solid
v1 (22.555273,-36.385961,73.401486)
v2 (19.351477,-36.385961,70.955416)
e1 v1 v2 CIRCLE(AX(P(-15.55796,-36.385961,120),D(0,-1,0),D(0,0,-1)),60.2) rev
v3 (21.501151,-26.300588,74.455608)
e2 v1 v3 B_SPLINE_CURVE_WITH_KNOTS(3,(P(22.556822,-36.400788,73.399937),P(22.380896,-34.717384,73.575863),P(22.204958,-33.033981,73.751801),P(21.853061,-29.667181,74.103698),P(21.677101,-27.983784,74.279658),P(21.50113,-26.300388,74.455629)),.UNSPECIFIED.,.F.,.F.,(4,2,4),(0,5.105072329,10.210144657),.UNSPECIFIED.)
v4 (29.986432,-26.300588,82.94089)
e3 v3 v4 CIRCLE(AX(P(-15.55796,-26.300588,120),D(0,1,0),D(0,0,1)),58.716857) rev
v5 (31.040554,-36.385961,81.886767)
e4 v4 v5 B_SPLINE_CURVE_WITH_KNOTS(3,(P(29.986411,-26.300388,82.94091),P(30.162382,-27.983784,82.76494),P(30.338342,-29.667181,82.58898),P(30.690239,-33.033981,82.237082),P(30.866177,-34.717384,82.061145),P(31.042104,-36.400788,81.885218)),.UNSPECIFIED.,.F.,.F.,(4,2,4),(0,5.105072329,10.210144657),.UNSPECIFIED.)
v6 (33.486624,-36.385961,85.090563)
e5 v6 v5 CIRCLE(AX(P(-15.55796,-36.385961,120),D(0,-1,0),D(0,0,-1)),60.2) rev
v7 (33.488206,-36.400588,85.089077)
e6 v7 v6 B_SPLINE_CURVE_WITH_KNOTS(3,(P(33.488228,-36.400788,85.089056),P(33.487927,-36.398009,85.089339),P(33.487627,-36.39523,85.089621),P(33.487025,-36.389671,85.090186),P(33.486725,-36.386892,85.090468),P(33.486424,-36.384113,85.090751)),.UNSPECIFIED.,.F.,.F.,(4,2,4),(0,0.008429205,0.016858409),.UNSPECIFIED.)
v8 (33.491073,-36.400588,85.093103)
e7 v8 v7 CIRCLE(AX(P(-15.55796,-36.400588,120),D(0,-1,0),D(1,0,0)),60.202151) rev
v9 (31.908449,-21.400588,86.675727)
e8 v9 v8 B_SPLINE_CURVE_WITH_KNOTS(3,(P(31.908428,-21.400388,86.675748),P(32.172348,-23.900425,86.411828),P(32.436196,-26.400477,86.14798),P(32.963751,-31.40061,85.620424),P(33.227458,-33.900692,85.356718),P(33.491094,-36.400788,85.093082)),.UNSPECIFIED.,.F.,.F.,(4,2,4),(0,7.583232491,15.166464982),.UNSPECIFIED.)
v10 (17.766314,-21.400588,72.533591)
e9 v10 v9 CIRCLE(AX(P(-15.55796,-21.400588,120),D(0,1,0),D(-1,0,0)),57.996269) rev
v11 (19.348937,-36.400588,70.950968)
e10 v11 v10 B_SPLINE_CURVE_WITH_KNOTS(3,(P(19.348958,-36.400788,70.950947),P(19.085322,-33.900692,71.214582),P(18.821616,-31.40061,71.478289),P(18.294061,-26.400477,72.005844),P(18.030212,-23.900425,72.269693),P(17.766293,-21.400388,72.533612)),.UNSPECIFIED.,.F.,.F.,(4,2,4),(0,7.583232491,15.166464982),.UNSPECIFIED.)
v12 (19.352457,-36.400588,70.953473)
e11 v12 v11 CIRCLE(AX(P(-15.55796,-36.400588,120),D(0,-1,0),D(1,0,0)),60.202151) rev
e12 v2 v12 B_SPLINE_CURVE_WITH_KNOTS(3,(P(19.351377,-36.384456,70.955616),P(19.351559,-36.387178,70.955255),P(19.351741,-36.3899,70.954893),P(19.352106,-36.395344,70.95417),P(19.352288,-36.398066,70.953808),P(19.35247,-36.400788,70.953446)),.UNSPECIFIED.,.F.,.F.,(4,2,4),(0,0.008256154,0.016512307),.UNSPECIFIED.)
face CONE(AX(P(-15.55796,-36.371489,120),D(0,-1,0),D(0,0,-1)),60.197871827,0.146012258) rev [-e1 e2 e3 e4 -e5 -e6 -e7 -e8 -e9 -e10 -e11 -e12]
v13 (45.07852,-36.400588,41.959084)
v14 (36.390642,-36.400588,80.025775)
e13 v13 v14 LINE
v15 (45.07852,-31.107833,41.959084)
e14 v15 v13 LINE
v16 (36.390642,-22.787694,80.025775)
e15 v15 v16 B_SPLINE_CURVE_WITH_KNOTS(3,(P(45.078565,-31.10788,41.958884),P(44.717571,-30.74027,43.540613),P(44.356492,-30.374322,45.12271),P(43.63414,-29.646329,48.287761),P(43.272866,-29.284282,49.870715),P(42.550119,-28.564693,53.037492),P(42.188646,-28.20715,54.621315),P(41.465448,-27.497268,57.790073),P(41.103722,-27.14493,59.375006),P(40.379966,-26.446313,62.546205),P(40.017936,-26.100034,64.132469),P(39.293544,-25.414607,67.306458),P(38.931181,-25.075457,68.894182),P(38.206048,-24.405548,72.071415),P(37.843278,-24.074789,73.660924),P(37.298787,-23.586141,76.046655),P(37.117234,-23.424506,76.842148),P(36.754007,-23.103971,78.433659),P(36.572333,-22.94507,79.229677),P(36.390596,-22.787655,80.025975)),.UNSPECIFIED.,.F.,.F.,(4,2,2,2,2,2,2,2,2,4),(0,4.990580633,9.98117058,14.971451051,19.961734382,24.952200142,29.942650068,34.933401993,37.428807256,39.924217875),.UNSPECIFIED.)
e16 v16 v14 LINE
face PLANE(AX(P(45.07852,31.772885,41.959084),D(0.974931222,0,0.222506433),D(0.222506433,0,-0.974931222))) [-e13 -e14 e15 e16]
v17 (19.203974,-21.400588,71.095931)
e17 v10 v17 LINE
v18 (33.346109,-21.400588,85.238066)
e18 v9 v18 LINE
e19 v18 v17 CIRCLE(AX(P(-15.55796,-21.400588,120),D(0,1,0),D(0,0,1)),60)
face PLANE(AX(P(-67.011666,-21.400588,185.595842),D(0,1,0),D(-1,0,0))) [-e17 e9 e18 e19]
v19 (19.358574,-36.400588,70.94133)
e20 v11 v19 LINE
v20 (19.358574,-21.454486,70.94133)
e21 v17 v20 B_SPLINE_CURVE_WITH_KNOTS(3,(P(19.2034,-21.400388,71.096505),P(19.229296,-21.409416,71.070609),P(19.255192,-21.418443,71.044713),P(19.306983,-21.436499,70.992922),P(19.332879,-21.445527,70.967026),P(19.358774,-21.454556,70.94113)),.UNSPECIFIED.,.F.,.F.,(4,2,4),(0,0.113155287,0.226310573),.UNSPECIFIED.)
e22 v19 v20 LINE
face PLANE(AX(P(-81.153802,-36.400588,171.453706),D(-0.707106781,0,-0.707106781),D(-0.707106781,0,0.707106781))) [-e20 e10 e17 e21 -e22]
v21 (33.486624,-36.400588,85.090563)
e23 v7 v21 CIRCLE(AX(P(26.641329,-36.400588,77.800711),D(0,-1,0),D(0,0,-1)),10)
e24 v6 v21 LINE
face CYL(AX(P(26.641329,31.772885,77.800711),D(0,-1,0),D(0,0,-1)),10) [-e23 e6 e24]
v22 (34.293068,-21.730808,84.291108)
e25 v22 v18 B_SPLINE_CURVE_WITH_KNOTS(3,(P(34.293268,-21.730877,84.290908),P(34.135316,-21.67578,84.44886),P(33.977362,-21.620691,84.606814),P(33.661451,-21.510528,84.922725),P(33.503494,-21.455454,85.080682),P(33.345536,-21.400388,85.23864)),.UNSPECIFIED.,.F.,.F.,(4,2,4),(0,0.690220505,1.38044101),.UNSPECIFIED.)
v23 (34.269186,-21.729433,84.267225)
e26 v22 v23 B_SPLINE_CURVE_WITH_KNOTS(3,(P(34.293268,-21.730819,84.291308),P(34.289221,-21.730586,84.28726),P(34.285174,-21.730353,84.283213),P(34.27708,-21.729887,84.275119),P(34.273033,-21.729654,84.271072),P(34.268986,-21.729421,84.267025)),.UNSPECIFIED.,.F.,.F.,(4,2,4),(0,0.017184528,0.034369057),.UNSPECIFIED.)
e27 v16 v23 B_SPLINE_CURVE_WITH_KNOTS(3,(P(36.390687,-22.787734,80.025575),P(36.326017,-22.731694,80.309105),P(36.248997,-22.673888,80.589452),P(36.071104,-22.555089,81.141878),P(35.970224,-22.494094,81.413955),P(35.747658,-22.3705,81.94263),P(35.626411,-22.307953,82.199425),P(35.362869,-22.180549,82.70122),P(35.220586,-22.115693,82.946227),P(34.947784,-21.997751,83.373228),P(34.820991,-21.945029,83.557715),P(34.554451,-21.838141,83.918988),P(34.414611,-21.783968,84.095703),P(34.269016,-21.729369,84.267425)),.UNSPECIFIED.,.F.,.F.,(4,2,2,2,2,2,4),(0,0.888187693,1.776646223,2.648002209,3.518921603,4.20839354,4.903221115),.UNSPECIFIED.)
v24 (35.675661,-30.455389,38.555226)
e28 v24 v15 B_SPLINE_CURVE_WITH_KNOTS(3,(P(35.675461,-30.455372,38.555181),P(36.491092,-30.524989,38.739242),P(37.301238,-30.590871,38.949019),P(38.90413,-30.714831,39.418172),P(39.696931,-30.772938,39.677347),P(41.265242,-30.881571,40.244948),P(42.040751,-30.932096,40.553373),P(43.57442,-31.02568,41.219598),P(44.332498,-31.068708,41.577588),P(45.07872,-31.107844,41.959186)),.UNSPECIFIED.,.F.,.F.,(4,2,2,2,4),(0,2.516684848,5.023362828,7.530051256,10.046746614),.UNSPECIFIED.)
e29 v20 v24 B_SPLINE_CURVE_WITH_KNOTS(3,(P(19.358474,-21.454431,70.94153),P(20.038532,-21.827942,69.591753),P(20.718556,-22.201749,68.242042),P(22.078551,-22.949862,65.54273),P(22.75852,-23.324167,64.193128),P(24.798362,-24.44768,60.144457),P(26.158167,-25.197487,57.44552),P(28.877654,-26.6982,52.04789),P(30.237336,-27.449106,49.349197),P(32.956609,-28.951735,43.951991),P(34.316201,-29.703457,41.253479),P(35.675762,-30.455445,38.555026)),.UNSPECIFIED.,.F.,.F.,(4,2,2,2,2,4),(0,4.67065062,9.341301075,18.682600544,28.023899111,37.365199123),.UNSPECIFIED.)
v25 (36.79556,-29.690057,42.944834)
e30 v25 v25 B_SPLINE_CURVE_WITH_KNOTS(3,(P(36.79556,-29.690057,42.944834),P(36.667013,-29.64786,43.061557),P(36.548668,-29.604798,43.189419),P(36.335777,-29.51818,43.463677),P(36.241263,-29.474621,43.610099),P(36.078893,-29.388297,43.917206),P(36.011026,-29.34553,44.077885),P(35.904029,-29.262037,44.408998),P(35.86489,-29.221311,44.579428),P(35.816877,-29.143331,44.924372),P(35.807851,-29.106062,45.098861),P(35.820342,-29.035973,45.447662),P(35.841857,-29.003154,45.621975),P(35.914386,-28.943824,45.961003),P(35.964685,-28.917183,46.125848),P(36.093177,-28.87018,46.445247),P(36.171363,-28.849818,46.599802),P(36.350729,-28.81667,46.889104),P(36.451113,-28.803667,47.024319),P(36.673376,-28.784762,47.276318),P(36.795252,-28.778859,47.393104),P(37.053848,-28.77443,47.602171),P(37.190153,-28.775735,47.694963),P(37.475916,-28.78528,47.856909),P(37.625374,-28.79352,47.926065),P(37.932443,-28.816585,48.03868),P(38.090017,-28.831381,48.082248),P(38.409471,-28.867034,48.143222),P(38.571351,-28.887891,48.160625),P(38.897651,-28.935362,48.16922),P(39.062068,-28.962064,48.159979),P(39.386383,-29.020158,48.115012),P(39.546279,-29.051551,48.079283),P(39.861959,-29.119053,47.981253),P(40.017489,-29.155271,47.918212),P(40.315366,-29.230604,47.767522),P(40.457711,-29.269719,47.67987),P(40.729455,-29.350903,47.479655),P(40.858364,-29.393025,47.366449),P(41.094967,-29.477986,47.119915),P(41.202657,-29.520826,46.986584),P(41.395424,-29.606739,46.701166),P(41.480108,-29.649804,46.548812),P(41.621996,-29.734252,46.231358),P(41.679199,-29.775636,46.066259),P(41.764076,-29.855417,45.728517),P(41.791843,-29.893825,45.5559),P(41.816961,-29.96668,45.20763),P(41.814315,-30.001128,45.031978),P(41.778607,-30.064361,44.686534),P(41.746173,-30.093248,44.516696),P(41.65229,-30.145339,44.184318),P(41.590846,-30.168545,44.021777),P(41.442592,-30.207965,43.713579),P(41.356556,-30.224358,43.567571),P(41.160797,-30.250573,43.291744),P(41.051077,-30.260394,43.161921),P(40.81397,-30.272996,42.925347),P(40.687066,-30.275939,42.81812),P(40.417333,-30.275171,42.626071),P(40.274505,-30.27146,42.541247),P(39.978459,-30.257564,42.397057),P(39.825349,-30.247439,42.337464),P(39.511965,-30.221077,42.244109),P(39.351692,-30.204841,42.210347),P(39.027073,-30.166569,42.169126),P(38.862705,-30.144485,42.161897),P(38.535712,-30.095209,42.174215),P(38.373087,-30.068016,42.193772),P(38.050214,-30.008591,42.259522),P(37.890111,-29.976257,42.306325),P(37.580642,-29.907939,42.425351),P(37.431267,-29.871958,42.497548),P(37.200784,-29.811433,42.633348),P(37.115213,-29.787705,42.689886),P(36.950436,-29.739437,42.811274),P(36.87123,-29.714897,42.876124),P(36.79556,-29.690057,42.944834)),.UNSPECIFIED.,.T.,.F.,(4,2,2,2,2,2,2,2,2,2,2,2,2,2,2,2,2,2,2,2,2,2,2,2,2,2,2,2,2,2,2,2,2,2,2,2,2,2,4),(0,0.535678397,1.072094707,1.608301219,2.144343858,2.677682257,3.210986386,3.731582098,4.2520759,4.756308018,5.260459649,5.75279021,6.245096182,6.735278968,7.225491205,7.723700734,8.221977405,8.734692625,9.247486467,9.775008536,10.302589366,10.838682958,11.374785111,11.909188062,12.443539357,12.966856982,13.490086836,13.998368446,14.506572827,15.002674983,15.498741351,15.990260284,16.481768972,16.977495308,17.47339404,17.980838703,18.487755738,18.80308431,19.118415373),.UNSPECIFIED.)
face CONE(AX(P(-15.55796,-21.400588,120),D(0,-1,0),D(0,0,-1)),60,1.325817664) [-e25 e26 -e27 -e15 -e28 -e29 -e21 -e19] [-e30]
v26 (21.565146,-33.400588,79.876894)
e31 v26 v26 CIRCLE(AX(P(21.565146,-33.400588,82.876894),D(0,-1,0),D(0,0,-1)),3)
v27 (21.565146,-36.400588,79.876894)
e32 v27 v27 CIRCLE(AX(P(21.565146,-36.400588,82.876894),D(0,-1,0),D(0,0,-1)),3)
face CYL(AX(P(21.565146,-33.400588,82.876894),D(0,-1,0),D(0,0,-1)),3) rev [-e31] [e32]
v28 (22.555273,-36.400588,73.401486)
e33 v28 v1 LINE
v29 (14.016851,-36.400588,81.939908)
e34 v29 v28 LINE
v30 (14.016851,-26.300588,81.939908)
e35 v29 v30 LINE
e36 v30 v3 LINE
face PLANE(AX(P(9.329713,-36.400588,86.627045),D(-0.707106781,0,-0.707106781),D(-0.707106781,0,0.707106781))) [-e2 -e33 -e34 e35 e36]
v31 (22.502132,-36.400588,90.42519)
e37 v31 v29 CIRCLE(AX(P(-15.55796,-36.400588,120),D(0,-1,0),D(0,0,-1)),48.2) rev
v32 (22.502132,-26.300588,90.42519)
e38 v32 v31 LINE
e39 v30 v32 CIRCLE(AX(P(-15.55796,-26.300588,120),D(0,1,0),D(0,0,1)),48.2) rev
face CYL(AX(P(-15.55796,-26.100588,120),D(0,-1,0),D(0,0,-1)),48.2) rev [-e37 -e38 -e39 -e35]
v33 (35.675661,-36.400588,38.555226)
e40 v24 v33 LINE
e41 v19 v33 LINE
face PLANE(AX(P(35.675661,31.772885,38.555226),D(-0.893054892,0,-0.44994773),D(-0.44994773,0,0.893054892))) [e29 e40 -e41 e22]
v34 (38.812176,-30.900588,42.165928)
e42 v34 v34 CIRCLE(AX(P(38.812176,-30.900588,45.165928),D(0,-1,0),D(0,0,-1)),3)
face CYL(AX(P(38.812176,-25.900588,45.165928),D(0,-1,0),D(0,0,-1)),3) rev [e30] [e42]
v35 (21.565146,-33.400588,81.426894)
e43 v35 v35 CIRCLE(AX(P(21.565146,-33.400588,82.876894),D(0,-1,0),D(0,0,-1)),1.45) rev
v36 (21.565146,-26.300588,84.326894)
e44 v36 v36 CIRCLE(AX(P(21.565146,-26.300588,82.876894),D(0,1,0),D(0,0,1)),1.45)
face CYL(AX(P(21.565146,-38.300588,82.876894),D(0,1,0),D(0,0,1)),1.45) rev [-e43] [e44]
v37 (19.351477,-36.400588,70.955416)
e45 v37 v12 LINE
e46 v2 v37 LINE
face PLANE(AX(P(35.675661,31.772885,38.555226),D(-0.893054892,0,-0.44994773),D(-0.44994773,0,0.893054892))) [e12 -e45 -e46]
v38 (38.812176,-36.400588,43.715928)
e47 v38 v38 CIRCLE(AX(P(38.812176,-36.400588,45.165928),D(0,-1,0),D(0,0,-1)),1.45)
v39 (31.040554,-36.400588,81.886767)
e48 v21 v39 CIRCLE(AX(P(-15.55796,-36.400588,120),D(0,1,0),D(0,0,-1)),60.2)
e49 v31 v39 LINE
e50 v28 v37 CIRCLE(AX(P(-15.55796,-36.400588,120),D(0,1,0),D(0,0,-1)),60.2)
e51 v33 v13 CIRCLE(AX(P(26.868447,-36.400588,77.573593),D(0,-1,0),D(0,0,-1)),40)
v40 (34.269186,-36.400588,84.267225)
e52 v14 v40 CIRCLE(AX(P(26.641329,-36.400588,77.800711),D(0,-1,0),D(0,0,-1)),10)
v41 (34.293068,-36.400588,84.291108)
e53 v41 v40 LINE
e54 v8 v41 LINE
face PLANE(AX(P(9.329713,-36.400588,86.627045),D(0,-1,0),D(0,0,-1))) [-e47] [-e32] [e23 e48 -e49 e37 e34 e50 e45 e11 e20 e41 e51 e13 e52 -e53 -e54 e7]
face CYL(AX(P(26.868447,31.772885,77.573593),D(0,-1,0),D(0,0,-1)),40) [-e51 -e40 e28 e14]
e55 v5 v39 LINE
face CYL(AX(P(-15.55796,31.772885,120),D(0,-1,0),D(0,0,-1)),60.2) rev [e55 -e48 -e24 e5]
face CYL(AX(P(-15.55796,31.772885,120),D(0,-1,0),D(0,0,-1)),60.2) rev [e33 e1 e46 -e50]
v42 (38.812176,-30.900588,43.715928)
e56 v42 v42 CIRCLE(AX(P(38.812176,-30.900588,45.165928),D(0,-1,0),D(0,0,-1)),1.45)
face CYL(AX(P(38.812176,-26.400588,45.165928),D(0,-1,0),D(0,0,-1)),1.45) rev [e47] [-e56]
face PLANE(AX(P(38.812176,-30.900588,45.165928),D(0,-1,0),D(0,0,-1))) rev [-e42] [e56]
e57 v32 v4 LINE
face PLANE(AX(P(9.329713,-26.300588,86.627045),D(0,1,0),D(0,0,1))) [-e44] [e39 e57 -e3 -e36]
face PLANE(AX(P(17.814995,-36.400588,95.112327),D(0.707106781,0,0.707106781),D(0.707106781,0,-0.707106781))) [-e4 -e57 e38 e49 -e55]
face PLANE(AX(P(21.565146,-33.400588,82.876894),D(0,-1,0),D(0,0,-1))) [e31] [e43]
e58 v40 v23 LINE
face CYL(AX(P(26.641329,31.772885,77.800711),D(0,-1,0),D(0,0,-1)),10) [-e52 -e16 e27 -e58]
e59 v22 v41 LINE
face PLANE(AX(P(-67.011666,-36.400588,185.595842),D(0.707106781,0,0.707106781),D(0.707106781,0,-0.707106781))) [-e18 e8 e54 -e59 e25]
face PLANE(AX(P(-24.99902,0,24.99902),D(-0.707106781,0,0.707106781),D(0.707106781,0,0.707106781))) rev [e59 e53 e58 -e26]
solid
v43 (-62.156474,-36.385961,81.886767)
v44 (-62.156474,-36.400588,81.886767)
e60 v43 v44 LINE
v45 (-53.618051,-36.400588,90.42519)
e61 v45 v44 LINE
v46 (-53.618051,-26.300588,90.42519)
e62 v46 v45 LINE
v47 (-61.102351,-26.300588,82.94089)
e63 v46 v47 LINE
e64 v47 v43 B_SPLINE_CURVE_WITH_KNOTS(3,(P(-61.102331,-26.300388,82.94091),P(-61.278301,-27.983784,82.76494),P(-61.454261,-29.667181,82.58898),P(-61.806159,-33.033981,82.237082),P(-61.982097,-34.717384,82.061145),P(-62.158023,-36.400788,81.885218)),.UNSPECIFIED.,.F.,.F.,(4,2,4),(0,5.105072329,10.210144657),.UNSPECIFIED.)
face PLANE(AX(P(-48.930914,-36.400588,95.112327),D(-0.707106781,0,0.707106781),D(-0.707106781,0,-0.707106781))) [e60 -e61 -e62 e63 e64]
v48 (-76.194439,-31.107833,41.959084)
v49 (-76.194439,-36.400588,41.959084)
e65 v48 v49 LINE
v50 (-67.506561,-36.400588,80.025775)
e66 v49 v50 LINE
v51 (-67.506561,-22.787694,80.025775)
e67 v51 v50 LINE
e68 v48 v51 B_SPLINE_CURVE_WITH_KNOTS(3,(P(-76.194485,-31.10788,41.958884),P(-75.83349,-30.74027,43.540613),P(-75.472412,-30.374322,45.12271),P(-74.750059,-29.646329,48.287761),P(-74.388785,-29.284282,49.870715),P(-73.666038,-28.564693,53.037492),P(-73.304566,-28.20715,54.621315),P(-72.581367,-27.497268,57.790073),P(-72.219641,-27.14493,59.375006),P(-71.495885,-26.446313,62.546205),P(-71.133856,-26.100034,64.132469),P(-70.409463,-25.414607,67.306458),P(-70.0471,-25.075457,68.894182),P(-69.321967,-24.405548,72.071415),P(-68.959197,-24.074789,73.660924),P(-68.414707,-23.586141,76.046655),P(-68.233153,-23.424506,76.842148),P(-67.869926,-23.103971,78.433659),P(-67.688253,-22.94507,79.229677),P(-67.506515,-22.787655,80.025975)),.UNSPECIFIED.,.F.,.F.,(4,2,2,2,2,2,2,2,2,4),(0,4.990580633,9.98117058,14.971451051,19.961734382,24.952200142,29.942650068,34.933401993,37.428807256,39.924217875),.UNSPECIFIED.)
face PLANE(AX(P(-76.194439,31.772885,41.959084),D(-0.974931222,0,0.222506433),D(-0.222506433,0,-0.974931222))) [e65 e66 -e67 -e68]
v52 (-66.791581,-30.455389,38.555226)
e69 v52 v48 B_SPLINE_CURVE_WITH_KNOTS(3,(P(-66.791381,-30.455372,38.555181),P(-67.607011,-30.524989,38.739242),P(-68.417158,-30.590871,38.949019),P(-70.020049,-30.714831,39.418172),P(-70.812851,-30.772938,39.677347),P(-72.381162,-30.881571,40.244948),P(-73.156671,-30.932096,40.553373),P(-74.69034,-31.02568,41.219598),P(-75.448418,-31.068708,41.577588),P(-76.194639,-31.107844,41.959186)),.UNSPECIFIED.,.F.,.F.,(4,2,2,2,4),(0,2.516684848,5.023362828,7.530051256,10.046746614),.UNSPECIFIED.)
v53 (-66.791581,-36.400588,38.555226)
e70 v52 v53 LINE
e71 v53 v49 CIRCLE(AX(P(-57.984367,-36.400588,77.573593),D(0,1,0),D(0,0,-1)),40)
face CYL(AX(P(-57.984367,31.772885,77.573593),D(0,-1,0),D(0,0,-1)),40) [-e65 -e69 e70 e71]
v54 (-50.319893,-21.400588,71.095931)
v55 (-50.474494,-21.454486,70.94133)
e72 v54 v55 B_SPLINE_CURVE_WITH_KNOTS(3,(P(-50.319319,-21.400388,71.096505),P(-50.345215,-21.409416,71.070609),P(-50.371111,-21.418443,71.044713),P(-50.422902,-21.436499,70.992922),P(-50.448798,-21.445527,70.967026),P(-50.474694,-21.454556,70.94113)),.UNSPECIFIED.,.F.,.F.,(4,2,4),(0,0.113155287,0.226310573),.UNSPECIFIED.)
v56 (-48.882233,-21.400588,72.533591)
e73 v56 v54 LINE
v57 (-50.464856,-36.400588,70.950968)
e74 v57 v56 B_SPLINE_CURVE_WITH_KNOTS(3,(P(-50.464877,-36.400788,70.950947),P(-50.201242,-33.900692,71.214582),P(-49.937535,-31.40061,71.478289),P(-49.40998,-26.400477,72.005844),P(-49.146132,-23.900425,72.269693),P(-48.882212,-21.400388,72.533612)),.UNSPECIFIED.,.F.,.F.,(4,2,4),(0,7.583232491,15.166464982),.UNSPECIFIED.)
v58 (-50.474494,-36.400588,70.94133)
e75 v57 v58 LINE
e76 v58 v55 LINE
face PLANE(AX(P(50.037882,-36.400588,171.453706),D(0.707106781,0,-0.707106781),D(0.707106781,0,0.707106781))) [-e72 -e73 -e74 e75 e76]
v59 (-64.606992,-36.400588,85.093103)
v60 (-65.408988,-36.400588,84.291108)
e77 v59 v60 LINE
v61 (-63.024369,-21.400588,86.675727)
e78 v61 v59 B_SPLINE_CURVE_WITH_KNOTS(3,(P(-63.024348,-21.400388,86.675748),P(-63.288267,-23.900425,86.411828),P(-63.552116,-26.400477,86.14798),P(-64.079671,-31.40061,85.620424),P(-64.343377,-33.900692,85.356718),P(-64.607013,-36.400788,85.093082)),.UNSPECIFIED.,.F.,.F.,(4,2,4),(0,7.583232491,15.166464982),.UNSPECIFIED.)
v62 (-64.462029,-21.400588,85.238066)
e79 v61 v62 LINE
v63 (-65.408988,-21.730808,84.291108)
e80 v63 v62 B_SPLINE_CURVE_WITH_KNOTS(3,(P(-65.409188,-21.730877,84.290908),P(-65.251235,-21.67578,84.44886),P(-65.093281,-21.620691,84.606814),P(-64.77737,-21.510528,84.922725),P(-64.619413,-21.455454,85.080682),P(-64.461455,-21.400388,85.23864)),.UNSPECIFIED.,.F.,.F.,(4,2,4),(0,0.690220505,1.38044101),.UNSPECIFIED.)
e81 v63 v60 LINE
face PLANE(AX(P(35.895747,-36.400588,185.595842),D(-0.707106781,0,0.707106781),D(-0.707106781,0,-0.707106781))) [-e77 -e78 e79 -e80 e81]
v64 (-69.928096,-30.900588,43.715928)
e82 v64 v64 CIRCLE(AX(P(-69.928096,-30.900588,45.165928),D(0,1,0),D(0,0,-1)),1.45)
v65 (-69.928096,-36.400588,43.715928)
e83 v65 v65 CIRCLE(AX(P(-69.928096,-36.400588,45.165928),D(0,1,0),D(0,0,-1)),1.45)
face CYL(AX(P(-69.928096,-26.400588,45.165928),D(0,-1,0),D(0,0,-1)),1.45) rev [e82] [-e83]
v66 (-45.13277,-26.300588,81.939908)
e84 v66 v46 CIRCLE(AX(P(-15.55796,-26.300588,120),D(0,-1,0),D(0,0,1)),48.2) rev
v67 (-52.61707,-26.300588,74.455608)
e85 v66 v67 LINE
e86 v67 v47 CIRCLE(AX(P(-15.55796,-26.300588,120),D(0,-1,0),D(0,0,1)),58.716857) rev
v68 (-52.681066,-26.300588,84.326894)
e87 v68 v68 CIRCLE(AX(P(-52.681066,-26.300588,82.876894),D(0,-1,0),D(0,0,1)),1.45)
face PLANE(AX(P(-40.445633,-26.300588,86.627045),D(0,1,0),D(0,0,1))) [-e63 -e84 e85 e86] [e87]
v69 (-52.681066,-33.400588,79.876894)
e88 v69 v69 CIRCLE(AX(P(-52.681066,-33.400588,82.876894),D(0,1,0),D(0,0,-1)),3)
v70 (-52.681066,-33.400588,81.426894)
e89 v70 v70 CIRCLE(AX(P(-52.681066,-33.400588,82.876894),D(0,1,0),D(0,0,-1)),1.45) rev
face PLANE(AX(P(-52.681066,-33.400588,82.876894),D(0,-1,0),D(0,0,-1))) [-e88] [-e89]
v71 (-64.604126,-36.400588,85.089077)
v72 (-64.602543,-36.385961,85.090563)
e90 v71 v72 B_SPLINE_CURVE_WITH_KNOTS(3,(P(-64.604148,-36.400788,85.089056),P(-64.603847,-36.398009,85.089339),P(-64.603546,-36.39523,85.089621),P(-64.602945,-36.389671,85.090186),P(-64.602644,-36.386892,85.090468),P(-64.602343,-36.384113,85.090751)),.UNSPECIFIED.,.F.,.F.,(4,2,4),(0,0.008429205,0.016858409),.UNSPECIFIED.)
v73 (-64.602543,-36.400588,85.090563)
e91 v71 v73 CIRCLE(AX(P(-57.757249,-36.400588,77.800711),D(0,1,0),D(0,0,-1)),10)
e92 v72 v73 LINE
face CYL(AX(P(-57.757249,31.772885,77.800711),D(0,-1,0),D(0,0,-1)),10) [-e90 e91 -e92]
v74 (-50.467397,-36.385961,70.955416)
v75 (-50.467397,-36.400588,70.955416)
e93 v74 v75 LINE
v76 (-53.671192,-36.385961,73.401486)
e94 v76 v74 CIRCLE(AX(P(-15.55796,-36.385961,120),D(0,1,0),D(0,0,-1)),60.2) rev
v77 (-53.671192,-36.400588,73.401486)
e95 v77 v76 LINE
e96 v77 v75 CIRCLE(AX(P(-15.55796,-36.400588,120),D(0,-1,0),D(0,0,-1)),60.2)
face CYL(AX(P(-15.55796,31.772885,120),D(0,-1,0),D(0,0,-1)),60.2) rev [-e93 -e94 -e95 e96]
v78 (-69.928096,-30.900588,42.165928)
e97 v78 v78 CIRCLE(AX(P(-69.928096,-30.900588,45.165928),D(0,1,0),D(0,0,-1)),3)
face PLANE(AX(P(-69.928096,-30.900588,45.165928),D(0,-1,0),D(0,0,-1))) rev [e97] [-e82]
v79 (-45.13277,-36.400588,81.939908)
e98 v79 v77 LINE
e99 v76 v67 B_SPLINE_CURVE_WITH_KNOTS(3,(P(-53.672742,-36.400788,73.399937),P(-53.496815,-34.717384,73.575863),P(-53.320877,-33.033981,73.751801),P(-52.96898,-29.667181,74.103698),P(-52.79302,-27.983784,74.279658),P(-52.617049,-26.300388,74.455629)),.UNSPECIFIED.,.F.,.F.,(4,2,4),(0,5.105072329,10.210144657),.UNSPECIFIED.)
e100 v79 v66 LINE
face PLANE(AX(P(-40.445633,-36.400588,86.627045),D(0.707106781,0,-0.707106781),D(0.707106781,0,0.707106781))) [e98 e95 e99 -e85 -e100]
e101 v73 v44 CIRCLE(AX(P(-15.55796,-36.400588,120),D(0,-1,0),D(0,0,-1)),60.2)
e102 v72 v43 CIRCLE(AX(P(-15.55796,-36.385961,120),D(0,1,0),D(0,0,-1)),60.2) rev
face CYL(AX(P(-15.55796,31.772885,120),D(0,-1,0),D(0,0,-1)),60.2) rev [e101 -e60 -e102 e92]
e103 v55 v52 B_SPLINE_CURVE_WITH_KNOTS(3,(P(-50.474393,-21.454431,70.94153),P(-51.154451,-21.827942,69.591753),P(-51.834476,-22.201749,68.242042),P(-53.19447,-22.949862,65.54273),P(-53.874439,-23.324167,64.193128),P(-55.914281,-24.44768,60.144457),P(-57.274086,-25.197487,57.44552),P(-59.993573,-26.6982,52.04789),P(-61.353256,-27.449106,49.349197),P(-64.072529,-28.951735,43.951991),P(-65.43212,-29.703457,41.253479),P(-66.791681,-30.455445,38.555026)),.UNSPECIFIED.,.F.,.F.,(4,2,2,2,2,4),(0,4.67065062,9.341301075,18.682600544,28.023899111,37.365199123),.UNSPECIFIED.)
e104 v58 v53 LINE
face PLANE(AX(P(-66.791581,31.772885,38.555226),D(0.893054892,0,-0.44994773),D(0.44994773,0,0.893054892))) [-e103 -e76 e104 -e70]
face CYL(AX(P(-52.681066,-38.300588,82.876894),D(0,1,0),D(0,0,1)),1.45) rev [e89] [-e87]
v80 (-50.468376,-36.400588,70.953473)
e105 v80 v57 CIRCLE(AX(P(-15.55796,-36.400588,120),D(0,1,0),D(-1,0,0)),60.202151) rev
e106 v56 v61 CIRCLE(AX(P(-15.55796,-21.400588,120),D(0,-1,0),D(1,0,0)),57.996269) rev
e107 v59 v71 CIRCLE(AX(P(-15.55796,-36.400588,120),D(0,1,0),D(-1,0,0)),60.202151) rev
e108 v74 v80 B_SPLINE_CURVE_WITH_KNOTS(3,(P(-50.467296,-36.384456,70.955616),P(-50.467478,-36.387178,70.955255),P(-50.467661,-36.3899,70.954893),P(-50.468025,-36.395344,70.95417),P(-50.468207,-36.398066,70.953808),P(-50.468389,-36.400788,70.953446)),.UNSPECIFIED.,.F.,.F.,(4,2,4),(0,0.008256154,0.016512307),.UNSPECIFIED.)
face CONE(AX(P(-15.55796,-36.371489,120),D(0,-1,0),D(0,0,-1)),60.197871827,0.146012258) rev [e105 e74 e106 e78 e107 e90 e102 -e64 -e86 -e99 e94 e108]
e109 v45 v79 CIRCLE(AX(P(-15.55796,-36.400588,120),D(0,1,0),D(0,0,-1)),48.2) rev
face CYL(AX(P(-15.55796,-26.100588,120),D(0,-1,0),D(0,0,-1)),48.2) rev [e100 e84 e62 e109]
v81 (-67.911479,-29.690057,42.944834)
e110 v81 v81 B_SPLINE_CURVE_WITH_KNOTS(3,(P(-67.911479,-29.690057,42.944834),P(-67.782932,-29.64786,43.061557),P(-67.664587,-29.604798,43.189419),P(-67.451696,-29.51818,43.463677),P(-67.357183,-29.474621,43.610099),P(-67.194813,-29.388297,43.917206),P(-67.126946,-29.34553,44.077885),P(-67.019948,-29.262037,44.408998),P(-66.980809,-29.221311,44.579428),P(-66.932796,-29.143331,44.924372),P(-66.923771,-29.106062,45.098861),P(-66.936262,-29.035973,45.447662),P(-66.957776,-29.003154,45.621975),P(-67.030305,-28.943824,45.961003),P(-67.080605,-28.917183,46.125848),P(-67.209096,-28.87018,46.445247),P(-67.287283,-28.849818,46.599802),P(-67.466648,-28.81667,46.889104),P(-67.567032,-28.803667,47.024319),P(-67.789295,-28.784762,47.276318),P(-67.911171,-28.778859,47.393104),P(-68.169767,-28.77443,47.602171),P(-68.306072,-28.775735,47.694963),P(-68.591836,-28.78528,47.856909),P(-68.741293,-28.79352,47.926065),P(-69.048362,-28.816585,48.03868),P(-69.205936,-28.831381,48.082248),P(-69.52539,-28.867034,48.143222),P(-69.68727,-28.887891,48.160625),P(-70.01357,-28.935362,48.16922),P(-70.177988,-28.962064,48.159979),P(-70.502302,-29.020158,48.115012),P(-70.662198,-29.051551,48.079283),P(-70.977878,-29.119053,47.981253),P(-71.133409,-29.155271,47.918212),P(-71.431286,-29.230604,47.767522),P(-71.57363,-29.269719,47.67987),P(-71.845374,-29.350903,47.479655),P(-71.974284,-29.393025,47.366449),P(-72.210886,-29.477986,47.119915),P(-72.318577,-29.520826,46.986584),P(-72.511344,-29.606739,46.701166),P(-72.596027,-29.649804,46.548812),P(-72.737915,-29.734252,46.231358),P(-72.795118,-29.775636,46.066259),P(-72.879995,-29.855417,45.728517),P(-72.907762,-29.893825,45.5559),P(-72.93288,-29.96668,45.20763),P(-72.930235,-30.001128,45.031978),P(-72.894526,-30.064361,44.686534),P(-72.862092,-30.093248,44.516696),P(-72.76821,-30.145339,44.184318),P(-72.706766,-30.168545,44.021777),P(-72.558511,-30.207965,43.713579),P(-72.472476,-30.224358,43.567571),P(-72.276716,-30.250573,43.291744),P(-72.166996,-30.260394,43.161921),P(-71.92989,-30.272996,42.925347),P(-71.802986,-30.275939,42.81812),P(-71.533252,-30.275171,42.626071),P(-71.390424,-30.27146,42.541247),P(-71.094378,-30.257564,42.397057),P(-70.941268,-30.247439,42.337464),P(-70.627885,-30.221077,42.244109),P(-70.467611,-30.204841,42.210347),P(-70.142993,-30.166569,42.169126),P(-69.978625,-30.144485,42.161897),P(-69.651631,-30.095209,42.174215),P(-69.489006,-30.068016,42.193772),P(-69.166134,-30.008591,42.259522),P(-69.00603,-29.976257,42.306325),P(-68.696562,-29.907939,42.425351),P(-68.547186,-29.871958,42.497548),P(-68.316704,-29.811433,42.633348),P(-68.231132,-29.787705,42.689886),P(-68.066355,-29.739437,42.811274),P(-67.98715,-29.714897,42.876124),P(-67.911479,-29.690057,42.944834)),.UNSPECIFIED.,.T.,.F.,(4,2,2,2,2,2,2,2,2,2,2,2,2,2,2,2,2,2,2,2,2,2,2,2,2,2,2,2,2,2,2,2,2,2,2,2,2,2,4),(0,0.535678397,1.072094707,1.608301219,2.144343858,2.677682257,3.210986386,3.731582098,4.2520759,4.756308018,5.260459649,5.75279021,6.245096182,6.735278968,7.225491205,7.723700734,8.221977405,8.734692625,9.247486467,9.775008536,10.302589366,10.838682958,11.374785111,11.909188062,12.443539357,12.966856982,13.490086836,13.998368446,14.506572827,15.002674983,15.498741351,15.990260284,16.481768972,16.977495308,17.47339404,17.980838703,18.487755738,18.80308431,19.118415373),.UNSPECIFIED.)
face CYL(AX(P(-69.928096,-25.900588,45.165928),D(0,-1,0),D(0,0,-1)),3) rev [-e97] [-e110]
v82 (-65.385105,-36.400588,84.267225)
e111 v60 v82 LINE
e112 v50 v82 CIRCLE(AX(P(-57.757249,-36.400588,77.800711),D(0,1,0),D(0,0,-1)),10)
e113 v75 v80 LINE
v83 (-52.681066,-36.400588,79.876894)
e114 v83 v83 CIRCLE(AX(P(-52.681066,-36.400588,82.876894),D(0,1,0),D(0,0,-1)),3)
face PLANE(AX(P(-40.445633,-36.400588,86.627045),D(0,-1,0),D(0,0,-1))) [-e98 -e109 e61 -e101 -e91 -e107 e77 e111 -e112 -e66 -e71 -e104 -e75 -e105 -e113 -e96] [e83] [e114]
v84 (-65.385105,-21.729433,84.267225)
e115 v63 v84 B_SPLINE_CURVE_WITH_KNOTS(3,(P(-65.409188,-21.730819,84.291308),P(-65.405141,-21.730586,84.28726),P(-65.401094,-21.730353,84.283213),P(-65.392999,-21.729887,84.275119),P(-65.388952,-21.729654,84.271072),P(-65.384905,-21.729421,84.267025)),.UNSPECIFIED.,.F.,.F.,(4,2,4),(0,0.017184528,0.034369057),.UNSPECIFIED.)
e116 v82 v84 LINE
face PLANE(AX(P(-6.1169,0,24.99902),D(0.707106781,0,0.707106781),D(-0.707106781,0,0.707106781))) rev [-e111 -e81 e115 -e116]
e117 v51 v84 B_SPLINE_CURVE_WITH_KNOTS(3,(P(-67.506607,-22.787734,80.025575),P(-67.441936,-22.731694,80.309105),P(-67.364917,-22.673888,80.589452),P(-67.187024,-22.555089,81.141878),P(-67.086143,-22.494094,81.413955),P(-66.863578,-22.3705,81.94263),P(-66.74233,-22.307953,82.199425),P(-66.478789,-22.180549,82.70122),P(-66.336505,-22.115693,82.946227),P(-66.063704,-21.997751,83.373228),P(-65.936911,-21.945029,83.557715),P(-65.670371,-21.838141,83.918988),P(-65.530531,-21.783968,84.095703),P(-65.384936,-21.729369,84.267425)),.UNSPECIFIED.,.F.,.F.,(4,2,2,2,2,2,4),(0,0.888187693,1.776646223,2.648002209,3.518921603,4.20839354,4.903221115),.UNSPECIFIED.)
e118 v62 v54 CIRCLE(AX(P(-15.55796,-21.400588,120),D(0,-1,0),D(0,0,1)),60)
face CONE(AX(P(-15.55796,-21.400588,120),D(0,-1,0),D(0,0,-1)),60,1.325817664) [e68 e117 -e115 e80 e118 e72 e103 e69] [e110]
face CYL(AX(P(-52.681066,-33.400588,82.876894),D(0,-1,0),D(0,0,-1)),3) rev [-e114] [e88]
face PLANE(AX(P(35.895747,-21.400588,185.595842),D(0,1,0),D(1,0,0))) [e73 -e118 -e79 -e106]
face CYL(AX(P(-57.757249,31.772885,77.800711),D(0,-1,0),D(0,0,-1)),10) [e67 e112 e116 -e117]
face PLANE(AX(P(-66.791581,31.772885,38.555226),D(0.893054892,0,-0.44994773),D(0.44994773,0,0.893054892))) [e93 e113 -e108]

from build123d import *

# Parameters (mm, degrees)
SALIENTE_EXTRUIR1_START = -36.400588291
SALIENTE_EXTRUIR1_DEPTH = 10.1
SALIENTE_EXTRUIR2_REACH = 99.517
SALIENTE_EXTRUIR2_START = -2.5
CROQUIS2_W              = 20
CROQUIS2_H              = 15
SALIENTE_EXTRUIR3_START = -15
SALIENTE_EXTRUIR3_DEPTH = 15
CORTAR_EXTRUIR1_START   = -5.5
CROQUIS5_R              = 3
CORTAR_EXTRUIR1_DEPTH   = 5
CROQUIS7_R              = 1.45
CORTAR_EXTRUIR2_DEPTH   = 10
CROQUIS8_R              = 1.45
CORTAR_EXTRUIR3_DEPTH   = 12
CROQUIS9_R              = 3
CORTAR_EXTRUIR4_DEPTH   = 3


# Read off the part's stored shape, not the designer's step: Saliente-Extruir1, Saliente-Extruir3
with BuildPart() as part:
    # Saliente-Extruir1 outline → Saliente-Extruir1 (new body)
    with BuildSketch(Plane(origin=(0, 0, 0), x_dir=(1, 0, 0), z_dir=(0, 1, 0)).offset(SALIENTE_EXTRUIR1_START)):
        with BuildLine():
            Line((22.502132111, -90.425189571), (33.23240821, -79.694913472))
            Line((33.23240821, -79.694913472), (24.747126835, -71.209632098))
            Line((24.747126835, -71.209632098), (14.016850737, -81.939908197))
            ThreePointArc((14.016850737, -81.939908197), (18.524587161, -85.917453147), (22.502132111, -90.425189571))
        make_face()
    extrude(amount=SALIENTE_EXTRUIR1_DEPTH)

    # Saliente-Extruir2: up to this cone (the profile starts outside it)
    saliente_extruir2_end = Plane(origin=(-15.557959692, -28.900588, 120), z_dir=(0, -1, 0)) * Cone(35.699767219, 82.498652467, 318.232419686, mode=Mode.PRIVATE)
    # Croquis2 → Saliente-Extruir2 (add, up to the surface)
    with BuildSketch(Plane(origin=(-23.231252631, 0, 23.231252631), x_dir=(-0.7071067811865487, 0, -0.7071067811865464), z_dir=(0.7071067811865464, 0, -0.7071067811865487)).offset(SALIENTE_EXTRUIR2_START), mode=Mode.PRIVATE) as saliente_extruir2_sk1:
        with Locations((-73.851674943, -28.900588291)):
            Rectangle(CROQUIS2_W, CROQUIS2_H)
    saliente_extruir2_tool1 = extrude(saliente_extruir2_sk1.sketch, amount=-SALIENTE_EXTRUIR2_REACH, mode=Mode.PRIVATE) - saliente_extruir2_end
    add(saliente_extruir2_tool1.solids().sort_by_distance((27.222001, -28.900588, 77.22004))[0])

    # Saliente-Extruir3 outline → Saliente-Extruir3 (add)
    with BuildSketch(Plane.XZ.offset(36.400588291).offset(SALIENTE_EXTRUIR3_START)):
        with BuildLine():
            ThreePointArc((35.675661183, 38.555225896), (40.483879833, 39.962158782), (45.07851977, 41.95908406))
            Line((45.07851977, 41.95908406), (36.39064162, 80.025775234))
            ThreePointArc((36.39064162, 80.025775234), (35.31648143, 82.774817587), (33.486624065, 85.090562823))
            ThreePointArc((33.486624065, 85.090562823), (27.009868535, 77.432171773), (19.351477485, 70.955416242))
            Line((19.351477485, 70.955416242), (19.352456623, 70.953472853))
            Line((19.352456623, 70.953472853), (35.675661183, 38.555225896))
        make_face()
    extrude(amount=SALIENTE_EXTRUIR3_DEPTH)

    # Croquis4 → Cortar-Revolución1 (revolve, cut)
    with BuildSketch(Plane(origin=(-15.557959692, -2.400588291, 120), x_dir=(0, 0, -1), z_dir=(1, 0, 0))):
        Polygon((60, -19), (100, -29), (100, -12.364078099), (60, -12.364078099), align=None)
    revolve(axis=Axis((-15.557959692, -2.400588291, 120), (0, -1, 0)), mode=Mode.SUBTRACT)

    # Croquis5 → Cortar-Extruir1 (cut)
    with BuildSketch(Plane.XZ.offset(36.400588291).offset(CORTAR_EXTRUIR1_START)):
        with Locations(Location((38.812176145, 45.16592802, 0), (0, 0, 270))):
            Circle(CROQUIS5_R)
    extrude(amount=-CORTAR_EXTRUIR1_DEPTH, mode=Mode.SUBTRACT)

    # Croquis7 → Cortar-Extruir2 (cut)
    with BuildSketch(Plane.XZ.offset(36.400588291)):
        with Locations(Location((38.812176145, 45.16592802, 0), (0, 0, 270))):
            Circle(CROQUIS7_R)
    extrude(amount=-CORTAR_EXTRUIR2_DEPTH, mode=Mode.SUBTRACT)

    # Croquis8 → Cortar-Extruir3 (cut)
    with BuildSketch(Plane(origin=(0, -26.300588291, 0), x_dir=(1, 0, 0), z_dir=(0, 1, 0))):
        with Locations(Location((21.56514632, -82.876893988, 0), (0, 0, 270))):
            Circle(CROQUIS8_R)
    extrude(amount=-CORTAR_EXTRUIR3_DEPTH, mode=Mode.SUBTRACT)

    # Croquis9 → Cortar-Extruir4 (cut)
    with BuildSketch(Plane.XZ.offset(36.400588291)):
        with Locations(Location((21.56514632, 82.876893988, 0), (0, 0, 270))):
            Circle(CROQUIS9_R)
    extrude(amount=-CORTAR_EXTRUIR4_DEPTH, mode=Mode.SUBTRACT)


with BuildPart() as body_2:
    # Simetría5: mirrored copy
    add(part.part.mirror(Plane(origin=(-15.557959692, -2.400588291, 120), x_dir=(0, 0, 1), z_dir=(1, 0, 0))))


solid = Compound([part.part, body_2.part])
